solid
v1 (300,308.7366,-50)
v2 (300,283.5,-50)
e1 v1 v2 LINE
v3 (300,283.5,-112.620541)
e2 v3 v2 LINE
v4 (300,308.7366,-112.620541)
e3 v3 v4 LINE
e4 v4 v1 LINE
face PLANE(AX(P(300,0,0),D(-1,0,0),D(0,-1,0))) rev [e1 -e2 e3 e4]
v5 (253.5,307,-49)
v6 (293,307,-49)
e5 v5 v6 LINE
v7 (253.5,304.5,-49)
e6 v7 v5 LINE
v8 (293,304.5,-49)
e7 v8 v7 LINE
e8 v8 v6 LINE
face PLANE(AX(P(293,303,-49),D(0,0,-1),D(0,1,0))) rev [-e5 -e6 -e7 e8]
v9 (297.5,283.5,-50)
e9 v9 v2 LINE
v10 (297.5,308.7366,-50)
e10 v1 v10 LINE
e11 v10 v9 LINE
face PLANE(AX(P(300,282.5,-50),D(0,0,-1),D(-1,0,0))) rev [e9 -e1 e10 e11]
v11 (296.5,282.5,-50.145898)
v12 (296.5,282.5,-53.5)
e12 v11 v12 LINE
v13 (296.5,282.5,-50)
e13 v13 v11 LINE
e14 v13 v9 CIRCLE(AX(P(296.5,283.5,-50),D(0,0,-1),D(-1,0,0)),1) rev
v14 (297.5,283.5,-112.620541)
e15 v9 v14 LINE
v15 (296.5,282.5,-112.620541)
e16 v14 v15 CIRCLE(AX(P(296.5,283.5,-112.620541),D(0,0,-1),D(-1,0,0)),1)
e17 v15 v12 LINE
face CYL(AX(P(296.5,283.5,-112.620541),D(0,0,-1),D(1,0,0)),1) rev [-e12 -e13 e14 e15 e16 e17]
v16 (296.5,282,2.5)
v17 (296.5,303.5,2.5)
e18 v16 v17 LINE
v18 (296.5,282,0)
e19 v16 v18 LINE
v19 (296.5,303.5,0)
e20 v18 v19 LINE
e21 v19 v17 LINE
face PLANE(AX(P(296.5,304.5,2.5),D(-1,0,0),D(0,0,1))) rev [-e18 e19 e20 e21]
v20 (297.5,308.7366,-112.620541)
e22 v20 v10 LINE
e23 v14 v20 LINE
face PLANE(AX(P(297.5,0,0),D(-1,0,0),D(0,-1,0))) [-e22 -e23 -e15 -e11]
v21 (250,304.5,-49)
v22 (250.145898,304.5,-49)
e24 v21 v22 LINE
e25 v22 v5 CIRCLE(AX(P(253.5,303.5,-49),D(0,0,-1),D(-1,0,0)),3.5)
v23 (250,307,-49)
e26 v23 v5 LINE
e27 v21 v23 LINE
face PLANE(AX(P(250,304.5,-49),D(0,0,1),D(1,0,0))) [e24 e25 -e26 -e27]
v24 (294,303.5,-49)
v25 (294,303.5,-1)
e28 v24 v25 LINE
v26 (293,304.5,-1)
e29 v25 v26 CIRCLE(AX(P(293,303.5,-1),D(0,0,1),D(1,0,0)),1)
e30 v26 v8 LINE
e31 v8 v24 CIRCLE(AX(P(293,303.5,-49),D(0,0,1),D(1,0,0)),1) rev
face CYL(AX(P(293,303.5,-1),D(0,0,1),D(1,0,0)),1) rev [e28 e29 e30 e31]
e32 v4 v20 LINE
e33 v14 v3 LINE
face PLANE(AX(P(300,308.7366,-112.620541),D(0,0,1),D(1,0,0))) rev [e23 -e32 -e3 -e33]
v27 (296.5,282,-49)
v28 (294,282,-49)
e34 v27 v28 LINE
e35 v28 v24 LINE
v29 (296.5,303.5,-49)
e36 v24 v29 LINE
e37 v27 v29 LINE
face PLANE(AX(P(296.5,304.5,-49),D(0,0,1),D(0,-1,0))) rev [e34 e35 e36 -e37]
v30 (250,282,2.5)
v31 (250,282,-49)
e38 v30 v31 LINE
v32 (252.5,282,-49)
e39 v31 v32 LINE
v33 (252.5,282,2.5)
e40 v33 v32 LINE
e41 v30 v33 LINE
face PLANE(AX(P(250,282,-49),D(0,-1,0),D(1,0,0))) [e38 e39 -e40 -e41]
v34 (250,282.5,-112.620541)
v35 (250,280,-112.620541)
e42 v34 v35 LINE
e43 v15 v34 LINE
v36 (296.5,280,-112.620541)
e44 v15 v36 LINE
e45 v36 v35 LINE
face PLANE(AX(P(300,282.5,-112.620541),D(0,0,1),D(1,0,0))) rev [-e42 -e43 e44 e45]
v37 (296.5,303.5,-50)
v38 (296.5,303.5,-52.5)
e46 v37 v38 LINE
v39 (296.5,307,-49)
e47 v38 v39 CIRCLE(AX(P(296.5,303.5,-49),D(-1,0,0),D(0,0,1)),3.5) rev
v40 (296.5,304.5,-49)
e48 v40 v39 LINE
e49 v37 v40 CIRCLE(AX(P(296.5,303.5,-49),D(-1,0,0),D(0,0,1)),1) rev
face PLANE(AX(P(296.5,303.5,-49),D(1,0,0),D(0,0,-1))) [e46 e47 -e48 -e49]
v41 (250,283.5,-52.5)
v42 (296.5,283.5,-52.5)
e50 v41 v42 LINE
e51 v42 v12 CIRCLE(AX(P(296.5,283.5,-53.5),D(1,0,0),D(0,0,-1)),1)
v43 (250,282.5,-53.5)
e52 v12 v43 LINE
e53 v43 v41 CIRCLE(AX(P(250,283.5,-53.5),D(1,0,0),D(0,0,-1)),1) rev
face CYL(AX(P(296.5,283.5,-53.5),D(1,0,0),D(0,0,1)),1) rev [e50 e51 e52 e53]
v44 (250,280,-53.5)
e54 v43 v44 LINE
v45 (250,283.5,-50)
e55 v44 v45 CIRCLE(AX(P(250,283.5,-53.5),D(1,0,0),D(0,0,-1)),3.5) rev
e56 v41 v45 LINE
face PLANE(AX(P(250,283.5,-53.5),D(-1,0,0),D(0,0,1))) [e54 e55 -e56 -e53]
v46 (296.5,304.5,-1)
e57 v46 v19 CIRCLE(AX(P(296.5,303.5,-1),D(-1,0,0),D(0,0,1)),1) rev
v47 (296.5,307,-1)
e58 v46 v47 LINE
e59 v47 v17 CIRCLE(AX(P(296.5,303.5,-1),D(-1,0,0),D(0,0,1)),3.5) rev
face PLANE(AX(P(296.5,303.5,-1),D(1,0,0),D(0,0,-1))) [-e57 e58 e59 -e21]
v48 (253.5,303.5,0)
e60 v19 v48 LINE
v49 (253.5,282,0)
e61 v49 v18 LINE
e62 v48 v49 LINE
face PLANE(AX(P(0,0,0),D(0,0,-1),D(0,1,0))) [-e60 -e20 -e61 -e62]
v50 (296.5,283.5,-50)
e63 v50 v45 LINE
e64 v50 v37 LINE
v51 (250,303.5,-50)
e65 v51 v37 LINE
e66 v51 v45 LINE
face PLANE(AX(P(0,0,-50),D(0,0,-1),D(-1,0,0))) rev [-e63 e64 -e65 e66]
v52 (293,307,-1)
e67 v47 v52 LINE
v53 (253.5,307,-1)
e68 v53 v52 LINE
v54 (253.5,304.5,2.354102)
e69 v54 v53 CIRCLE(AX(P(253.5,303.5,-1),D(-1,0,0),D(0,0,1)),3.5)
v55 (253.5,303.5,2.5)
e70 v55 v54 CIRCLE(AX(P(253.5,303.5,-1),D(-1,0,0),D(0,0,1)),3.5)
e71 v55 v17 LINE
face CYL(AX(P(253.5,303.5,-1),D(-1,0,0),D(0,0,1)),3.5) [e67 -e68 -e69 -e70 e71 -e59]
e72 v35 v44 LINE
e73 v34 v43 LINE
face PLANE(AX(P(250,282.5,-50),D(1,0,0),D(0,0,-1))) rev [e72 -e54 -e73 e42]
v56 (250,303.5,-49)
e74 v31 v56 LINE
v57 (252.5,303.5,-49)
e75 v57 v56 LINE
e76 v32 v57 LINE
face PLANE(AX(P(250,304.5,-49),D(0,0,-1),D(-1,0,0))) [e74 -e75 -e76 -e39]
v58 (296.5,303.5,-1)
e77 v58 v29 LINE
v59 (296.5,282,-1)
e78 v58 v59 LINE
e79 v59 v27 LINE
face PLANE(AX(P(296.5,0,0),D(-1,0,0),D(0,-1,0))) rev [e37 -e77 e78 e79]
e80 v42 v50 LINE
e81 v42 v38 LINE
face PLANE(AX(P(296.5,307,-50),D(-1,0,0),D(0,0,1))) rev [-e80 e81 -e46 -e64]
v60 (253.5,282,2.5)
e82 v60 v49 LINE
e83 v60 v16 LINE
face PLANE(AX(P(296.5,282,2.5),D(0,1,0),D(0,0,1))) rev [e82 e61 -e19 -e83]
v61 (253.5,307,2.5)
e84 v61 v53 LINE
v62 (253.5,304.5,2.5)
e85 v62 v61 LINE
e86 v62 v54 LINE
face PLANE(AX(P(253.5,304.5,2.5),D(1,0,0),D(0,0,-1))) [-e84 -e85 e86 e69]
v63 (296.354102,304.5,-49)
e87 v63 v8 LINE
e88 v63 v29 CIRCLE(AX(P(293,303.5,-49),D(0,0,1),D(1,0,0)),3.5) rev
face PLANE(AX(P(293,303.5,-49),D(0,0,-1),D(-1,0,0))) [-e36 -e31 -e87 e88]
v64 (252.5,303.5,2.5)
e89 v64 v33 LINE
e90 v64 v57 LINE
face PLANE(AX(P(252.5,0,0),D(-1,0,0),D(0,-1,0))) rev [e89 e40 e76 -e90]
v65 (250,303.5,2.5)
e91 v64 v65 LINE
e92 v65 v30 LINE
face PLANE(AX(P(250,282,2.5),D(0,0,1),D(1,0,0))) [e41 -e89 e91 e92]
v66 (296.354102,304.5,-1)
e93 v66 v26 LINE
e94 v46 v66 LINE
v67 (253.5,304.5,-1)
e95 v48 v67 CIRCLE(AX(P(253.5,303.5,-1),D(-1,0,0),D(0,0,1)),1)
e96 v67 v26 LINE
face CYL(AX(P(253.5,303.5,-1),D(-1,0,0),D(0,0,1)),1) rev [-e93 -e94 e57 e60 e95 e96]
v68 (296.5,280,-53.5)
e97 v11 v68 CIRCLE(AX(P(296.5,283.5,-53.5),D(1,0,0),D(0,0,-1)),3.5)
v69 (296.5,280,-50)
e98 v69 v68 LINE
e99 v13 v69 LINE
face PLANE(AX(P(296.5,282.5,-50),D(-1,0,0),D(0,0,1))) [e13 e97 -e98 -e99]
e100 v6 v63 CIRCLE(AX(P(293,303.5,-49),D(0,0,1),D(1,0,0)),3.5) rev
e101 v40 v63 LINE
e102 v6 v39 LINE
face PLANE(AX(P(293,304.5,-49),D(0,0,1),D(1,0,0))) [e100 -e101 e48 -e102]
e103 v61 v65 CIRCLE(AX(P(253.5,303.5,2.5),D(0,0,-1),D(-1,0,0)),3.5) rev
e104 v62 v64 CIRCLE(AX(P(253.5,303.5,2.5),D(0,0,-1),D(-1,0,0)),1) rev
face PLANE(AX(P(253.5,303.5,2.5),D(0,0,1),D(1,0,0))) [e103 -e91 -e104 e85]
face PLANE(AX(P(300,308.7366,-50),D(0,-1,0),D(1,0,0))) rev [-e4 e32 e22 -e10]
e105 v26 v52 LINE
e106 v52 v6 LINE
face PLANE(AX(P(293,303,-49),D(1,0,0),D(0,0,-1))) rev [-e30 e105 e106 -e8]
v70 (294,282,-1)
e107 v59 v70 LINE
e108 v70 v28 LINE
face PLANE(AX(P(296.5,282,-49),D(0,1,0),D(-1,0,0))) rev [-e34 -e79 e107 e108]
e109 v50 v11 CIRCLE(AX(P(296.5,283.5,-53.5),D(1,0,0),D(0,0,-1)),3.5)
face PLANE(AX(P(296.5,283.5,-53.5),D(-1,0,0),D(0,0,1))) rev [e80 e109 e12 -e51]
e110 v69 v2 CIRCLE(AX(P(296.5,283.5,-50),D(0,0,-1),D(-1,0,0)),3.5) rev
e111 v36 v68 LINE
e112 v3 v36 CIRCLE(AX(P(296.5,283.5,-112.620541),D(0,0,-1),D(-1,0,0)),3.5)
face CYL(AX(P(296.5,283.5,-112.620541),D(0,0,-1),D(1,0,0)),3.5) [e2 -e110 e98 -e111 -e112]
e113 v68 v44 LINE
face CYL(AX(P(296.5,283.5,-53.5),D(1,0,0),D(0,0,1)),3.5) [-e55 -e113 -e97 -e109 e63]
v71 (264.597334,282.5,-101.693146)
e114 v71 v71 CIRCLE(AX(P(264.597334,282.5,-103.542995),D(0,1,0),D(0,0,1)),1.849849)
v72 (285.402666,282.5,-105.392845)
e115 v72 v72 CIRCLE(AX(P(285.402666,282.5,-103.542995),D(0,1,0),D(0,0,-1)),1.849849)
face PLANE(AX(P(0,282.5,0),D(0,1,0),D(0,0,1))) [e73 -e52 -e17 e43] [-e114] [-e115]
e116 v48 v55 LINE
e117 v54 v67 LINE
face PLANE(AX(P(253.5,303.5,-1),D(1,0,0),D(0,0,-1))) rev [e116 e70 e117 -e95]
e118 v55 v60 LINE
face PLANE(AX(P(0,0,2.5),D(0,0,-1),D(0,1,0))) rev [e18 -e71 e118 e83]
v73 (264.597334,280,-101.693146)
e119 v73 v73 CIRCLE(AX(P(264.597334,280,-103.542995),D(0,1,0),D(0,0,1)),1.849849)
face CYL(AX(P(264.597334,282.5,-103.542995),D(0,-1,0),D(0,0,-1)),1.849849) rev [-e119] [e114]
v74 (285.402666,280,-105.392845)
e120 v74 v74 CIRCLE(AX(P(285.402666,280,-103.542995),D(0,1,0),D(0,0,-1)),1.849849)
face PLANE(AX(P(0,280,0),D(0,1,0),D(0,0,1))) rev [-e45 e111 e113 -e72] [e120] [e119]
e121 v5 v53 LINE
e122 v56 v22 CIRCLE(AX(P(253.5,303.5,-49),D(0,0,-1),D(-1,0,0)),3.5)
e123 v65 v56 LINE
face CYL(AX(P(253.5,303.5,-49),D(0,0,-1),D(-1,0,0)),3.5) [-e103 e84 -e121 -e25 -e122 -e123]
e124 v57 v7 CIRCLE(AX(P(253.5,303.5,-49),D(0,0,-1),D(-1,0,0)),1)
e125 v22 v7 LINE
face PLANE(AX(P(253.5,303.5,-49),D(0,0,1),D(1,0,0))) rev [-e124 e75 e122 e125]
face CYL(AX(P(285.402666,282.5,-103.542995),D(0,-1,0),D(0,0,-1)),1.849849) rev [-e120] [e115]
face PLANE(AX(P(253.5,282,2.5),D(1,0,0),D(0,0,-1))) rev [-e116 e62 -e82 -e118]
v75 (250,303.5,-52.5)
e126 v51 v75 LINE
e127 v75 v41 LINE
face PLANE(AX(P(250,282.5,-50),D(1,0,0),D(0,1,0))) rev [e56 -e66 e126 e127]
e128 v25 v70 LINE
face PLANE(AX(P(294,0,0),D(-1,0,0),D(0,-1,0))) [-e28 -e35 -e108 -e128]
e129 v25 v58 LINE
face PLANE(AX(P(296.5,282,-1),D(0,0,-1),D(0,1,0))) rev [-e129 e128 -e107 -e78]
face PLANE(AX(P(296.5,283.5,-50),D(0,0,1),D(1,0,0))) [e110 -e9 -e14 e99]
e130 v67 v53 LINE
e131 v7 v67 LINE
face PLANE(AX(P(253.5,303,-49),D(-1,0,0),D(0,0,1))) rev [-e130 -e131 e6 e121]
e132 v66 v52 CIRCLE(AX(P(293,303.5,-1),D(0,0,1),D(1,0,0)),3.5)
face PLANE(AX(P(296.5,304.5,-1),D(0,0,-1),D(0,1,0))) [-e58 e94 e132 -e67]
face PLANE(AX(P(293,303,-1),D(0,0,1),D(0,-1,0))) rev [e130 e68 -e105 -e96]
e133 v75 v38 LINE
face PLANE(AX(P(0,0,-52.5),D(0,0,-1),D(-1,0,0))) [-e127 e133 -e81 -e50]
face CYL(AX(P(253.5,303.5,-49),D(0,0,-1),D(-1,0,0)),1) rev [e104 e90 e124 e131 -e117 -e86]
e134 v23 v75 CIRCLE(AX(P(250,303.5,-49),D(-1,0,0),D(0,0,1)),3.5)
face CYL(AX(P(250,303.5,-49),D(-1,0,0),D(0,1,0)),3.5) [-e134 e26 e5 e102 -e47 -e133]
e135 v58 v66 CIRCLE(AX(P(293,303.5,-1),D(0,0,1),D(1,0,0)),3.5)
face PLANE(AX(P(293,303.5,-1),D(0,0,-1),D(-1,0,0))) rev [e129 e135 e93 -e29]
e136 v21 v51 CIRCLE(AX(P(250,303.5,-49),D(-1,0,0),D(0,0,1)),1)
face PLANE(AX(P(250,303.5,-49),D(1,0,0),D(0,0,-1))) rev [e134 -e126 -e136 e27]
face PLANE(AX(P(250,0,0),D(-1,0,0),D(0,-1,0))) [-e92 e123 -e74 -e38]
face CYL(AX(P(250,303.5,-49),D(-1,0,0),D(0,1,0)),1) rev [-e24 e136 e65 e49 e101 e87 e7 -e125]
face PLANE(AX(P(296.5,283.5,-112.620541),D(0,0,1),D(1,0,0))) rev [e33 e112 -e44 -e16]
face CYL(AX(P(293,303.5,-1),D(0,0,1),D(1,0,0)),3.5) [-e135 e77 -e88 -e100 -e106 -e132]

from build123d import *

# Parameters (mm, degrees)
BASE_FLANGE1_OUTLINE_W       = 50
BASE_FLANGE1_OUTLINE_H       = 62.620541263
BASE_FLANGE1_OUTLINE_R       = 1.849849123
BASE_FLANGE1_DEPTH           = 2.5
EDGE_FLANGE1_STRIP_W         = 12
EDGE_FLANGE1_STRIP_H         = 2.5
EDGE_FLANGE1_STRIP_CUT_DEPTH = 62.620541263
EDGE_FLANGE1_DEPTH           = 62.620541263
EDGE_FLANGE2_STRIP_W         = 12
EDGE_FLANGE2_STRIP_H         = 2.5
EDGE_FLANGE2_STRIP_CUT_DEPTH = 46.5
EDGE_FLANGE2_DEPTH           = 46.5
EDGE_FLANGE4_STRIP_W         = 12
EDGE_FLANGE4_STRIP_H         = 2.5
EDGE_FLANGE4_STRIP_CUT_DEPTH = 46.5
EDGE_FLANGE4_DEPTH           = 46.5
EDGE_FLANGE5_STRIP_W         = 12
EDGE_FLANGE5_STRIP_H         = 2.5
EDGE_FLANGE5_STRIP_CUT_DEPTH = 51.5
EDGE_FLANGE5_DEPTH           = 51.5
EDGE_FLANGE6_STRIP_W         = 12
EDGE_FLANGE6_STRIP_H         = 2.5
EDGE_FLANGE6_STRIP_CUT_DEPTH = 43
EDGE_FLANGE6_DEPTH           = 43
EDGE_FLANGE7_STRIP_W         = 12
EDGE_FLANGE7_STRIP_H         = 2.5
EDGE_FLANGE7_STRIP_CUT_DEPTH = 48
EDGE_FLANGE7_DEPTH           = 48
SKETCH31_W                   = 39.5
SKETCH31_H                   = 48
CUT_EXTRUDE1_DEPTH           = 4


# Read off the part's stored shape, not the designer's step: Base-Flange1
# Sheet-metal steps are written as plain solids
with BuildPart() as part:
    # Base-Flange1 outline → Base-Flange1 (new body)
    with BuildSketch(Plane(origin=(0, 280, 0), x_dir=(1, 0, 0), z_dir=(0, 1, 0))):
        with Locations((275, 81.310270632)):
            Rectangle(BASE_FLANGE1_OUTLINE_W, BASE_FLANGE1_OUTLINE_H)
        with Locations((264.597334147, 103.542995429)):
            Circle(BASE_FLANGE1_OUTLINE_R, mode=Mode.SUBTRACT)
        with Locations((285.402665853, 103.542995429)):
            Circle(BASE_FLANGE1_OUTLINE_R, mode=Mode.SUBTRACT)
    extrude(amount=BASE_FLANGE1_DEPTH)

    # Edge-Flange1 strip (across the edge) → Edge-Flange1 strip cut (cut)
    with BuildSketch(Plane(origin=(300, 282.5, -50), x_dir=(-1, 0, 0), z_dir=(0, 0, -1))):
        with Locations((-2.5, -1.25)):
            Rectangle(EDGE_FLANGE1_STRIP_W, EDGE_FLANGE1_STRIP_H)
    extrude(amount=EDGE_FLANGE1_STRIP_CUT_DEPTH, mode=Mode.SUBTRACT)

    # Edge-Flange1 section (across the edge) → Edge-Flange1 (add)
    with BuildSketch(Plane(origin=(300, 282.5, -50), x_dir=(-1, 0, 0), z_dir=(0, 0, -1))):
        with BuildLine():
            Line((0, 1), (0, 26.2366))
            Line((0, 26.2366), (2.5, 26.2366))
            Line((2.5, 26.2366), (2.5, 1))
            ThreePointArc((2.5, 1), (2.792893219, 0.292893219), (3.5, 0))
            Line((3.5, 0), (3.5, -2.5))
            ThreePointArc((3.5, -2.5), (1.025126266, -1.474873734), (0, 1))
        make_face()
    extrude(amount=EDGE_FLANGE1_DEPTH)

    # Edge-Flange2 strip (across the edge) → Edge-Flange2 strip cut (cut)
    with BuildSketch(Plane(origin=(250, 282.5, -50), x_dir=(0, 0, -1), z_dir=(1, 0, 0))):
        with Locations((-2.5, -1.25)):
            Rectangle(EDGE_FLANGE2_STRIP_W, EDGE_FLANGE2_STRIP_H)
    extrude(amount=EDGE_FLANGE2_STRIP_CUT_DEPTH, mode=Mode.SUBTRACT)

    # Edge-Flange2 section (across the edge) → Edge-Flange2 (add)
    with BuildSketch(Plane(origin=(250, 282.5, -50), x_dir=(0, 0, -1), z_dir=(1, 0, 0))):
        with BuildLine():
            Line((0, 1), (0, 24.5))
            Line((0, 24.5), (2.5, 24.5))
            Line((2.5, 24.5), (2.5, 1))
            ThreePointArc((2.5, 1), (2.792893219, 0.292893219), (3.5, 0))
            Line((3.5, 0), (3.5, -2.5))
            ThreePointArc((3.5, -2.5), (1.025126266, -1.474873734), (0, 1))
        make_face()
    extrude(amount=EDGE_FLANGE2_DEPTH)

    # Edge-Flange4 strip (across the edge) → Edge-Flange4 strip cut (cut)
    with BuildSketch(Plane(origin=(296.5, 307, -50), x_dir=(0, -1, 0), z_dir=(-1, 0, 0))):
        with Locations((-2.5, -1.25)):
            Rectangle(EDGE_FLANGE4_STRIP_W, EDGE_FLANGE4_STRIP_H)
    extrude(amount=EDGE_FLANGE4_STRIP_CUT_DEPTH, mode=Mode.SUBTRACT)

    # Edge-Flange4 section (across the edge) → Edge-Flange4 (add)
    with BuildSketch(Plane(origin=(296.5, 307, -50), x_dir=(0, -1, 0), z_dir=(-1, 0, 0))):
        with BuildLine():
            Line((0, 1), (0, 52.5))
            Line((0, 52.5), (2.5, 52.5))
            Line((2.5, 52.5), (2.5, 1))
            ThreePointArc((2.5, 1), (2.792893219, 0.292893219), (3.5, 0))
            Line((3.5, 0), (3.5, -2.5))
            ThreePointArc((3.5, -2.5), (1.025126266, -1.474873734), (0, 1))
        make_face()
    extrude(amount=EDGE_FLANGE4_DEPTH)

    # Edge-Flange5 strip (across the edge) → Edge-Flange5 strip cut (cut)
    with BuildSketch(Plane(origin=(250, 304.5, 2.5), x_dir=(1, 0, 0), z_dir=(0, 0, -1))):
        with Locations((-2.5, -1.25)):
            Rectangle(EDGE_FLANGE5_STRIP_W, EDGE_FLANGE5_STRIP_H)
    extrude(amount=EDGE_FLANGE5_STRIP_CUT_DEPTH, mode=Mode.SUBTRACT)

    # Edge-Flange5 section (across the edge) → Edge-Flange5 (add)
    with BuildSketch(Plane(origin=(250, 304.5, 2.5), x_dir=(1, 0, 0), z_dir=(0, 0, -1))):
        with BuildLine():
            Line((0, 1), (0, 22.5))
            Line((0, 22.5), (2.5, 22.5))
            Line((2.5, 22.5), (2.5, 1))
            ThreePointArc((2.5, 1), (2.792893219, 0.292893219), (3.5, 0))
            Line((3.5, 0), (3.5, -2.5))
            ThreePointArc((3.5, -2.5), (1.025126266, -1.474873734), (0, 1))
        make_face()
    extrude(amount=EDGE_FLANGE5_DEPTH)

    # Edge-Flange6 strip (across the edge) → Edge-Flange6 strip cut (cut)
    with BuildSketch(Plane(origin=(296.5, 304.5, 2.5), x_dir=(0, 0, -1), z_dir=(-1, 0, 0))):
        with Locations((-2.5, -1.25)):
            Rectangle(EDGE_FLANGE6_STRIP_W, EDGE_FLANGE6_STRIP_H)
    extrude(amount=EDGE_FLANGE6_STRIP_CUT_DEPTH, mode=Mode.SUBTRACT)

    # Edge-Flange6 section (across the edge) → Edge-Flange6 (add)
    with BuildSketch(Plane(origin=(296.5, 304.5, 2.5), x_dir=(0, 0, -1), z_dir=(-1, 0, 0))):
        with BuildLine():
            Line((0, 1), (0, 22.5))
            Line((0, 22.5), (2.5, 22.5))
            Line((2.5, 22.5), (2.5, 1))
            ThreePointArc((2.5, 1), (2.792893219, 0.292893219), (3.5, 0))
            Line((3.5, 0), (3.5, -2.5))
            ThreePointArc((3.5, -2.5), (1.025126266, -1.474873734), (0, 1))
        make_face()
    extrude(amount=EDGE_FLANGE6_DEPTH)

    # Edge-Flange7 strip (across the edge) → Edge-Flange7 strip cut (cut)
    with BuildSketch(Plane(origin=(296.5, 304.5, -49), x_dir=(-1, 0, 0), z_dir=(0, 0, 1))):
        with Locations((-2.5, -1.25)):
            Rectangle(EDGE_FLANGE7_STRIP_W, EDGE_FLANGE7_STRIP_H)
    extrude(amount=EDGE_FLANGE7_STRIP_CUT_DEPTH, mode=Mode.SUBTRACT)

    # Edge-Flange7 section (across the edge) → Edge-Flange7 (add)
    with BuildSketch(Plane(origin=(296.5, 304.5, -49), x_dir=(-1, 0, 0), z_dir=(0, 0, 1))):
        with BuildLine():
            Line((0, 1), (0, 22.5))
            Line((0, 22.5), (2.5, 22.5))
            Line((2.5, 22.5), (2.5, 1))
            ThreePointArc((2.5, 1), (2.792893219, 0.292893219), (3.5, 0))
            Line((3.5, 0), (3.5, -2.5))
            ThreePointArc((3.5, -2.5), (1.025126266, -1.474873734), (0, 1))
        make_face()
    extrude(amount=EDGE_FLANGE7_DEPTH)

    # Sketch31 → Cut-Extrude1 (cut)
    with BuildSketch(Plane(origin=(0, 307, 0), x_dir=(1, 0, 0), z_dir=(0, 1, 0))):
        with Locations((273.25, 25)):
            Rectangle(SKETCH31_W, SKETCH31_H)
    extrude(amount=-CUT_EXTRUDE1_DEPTH, mode=Mode.SUBTRACT)


solid = part.part
